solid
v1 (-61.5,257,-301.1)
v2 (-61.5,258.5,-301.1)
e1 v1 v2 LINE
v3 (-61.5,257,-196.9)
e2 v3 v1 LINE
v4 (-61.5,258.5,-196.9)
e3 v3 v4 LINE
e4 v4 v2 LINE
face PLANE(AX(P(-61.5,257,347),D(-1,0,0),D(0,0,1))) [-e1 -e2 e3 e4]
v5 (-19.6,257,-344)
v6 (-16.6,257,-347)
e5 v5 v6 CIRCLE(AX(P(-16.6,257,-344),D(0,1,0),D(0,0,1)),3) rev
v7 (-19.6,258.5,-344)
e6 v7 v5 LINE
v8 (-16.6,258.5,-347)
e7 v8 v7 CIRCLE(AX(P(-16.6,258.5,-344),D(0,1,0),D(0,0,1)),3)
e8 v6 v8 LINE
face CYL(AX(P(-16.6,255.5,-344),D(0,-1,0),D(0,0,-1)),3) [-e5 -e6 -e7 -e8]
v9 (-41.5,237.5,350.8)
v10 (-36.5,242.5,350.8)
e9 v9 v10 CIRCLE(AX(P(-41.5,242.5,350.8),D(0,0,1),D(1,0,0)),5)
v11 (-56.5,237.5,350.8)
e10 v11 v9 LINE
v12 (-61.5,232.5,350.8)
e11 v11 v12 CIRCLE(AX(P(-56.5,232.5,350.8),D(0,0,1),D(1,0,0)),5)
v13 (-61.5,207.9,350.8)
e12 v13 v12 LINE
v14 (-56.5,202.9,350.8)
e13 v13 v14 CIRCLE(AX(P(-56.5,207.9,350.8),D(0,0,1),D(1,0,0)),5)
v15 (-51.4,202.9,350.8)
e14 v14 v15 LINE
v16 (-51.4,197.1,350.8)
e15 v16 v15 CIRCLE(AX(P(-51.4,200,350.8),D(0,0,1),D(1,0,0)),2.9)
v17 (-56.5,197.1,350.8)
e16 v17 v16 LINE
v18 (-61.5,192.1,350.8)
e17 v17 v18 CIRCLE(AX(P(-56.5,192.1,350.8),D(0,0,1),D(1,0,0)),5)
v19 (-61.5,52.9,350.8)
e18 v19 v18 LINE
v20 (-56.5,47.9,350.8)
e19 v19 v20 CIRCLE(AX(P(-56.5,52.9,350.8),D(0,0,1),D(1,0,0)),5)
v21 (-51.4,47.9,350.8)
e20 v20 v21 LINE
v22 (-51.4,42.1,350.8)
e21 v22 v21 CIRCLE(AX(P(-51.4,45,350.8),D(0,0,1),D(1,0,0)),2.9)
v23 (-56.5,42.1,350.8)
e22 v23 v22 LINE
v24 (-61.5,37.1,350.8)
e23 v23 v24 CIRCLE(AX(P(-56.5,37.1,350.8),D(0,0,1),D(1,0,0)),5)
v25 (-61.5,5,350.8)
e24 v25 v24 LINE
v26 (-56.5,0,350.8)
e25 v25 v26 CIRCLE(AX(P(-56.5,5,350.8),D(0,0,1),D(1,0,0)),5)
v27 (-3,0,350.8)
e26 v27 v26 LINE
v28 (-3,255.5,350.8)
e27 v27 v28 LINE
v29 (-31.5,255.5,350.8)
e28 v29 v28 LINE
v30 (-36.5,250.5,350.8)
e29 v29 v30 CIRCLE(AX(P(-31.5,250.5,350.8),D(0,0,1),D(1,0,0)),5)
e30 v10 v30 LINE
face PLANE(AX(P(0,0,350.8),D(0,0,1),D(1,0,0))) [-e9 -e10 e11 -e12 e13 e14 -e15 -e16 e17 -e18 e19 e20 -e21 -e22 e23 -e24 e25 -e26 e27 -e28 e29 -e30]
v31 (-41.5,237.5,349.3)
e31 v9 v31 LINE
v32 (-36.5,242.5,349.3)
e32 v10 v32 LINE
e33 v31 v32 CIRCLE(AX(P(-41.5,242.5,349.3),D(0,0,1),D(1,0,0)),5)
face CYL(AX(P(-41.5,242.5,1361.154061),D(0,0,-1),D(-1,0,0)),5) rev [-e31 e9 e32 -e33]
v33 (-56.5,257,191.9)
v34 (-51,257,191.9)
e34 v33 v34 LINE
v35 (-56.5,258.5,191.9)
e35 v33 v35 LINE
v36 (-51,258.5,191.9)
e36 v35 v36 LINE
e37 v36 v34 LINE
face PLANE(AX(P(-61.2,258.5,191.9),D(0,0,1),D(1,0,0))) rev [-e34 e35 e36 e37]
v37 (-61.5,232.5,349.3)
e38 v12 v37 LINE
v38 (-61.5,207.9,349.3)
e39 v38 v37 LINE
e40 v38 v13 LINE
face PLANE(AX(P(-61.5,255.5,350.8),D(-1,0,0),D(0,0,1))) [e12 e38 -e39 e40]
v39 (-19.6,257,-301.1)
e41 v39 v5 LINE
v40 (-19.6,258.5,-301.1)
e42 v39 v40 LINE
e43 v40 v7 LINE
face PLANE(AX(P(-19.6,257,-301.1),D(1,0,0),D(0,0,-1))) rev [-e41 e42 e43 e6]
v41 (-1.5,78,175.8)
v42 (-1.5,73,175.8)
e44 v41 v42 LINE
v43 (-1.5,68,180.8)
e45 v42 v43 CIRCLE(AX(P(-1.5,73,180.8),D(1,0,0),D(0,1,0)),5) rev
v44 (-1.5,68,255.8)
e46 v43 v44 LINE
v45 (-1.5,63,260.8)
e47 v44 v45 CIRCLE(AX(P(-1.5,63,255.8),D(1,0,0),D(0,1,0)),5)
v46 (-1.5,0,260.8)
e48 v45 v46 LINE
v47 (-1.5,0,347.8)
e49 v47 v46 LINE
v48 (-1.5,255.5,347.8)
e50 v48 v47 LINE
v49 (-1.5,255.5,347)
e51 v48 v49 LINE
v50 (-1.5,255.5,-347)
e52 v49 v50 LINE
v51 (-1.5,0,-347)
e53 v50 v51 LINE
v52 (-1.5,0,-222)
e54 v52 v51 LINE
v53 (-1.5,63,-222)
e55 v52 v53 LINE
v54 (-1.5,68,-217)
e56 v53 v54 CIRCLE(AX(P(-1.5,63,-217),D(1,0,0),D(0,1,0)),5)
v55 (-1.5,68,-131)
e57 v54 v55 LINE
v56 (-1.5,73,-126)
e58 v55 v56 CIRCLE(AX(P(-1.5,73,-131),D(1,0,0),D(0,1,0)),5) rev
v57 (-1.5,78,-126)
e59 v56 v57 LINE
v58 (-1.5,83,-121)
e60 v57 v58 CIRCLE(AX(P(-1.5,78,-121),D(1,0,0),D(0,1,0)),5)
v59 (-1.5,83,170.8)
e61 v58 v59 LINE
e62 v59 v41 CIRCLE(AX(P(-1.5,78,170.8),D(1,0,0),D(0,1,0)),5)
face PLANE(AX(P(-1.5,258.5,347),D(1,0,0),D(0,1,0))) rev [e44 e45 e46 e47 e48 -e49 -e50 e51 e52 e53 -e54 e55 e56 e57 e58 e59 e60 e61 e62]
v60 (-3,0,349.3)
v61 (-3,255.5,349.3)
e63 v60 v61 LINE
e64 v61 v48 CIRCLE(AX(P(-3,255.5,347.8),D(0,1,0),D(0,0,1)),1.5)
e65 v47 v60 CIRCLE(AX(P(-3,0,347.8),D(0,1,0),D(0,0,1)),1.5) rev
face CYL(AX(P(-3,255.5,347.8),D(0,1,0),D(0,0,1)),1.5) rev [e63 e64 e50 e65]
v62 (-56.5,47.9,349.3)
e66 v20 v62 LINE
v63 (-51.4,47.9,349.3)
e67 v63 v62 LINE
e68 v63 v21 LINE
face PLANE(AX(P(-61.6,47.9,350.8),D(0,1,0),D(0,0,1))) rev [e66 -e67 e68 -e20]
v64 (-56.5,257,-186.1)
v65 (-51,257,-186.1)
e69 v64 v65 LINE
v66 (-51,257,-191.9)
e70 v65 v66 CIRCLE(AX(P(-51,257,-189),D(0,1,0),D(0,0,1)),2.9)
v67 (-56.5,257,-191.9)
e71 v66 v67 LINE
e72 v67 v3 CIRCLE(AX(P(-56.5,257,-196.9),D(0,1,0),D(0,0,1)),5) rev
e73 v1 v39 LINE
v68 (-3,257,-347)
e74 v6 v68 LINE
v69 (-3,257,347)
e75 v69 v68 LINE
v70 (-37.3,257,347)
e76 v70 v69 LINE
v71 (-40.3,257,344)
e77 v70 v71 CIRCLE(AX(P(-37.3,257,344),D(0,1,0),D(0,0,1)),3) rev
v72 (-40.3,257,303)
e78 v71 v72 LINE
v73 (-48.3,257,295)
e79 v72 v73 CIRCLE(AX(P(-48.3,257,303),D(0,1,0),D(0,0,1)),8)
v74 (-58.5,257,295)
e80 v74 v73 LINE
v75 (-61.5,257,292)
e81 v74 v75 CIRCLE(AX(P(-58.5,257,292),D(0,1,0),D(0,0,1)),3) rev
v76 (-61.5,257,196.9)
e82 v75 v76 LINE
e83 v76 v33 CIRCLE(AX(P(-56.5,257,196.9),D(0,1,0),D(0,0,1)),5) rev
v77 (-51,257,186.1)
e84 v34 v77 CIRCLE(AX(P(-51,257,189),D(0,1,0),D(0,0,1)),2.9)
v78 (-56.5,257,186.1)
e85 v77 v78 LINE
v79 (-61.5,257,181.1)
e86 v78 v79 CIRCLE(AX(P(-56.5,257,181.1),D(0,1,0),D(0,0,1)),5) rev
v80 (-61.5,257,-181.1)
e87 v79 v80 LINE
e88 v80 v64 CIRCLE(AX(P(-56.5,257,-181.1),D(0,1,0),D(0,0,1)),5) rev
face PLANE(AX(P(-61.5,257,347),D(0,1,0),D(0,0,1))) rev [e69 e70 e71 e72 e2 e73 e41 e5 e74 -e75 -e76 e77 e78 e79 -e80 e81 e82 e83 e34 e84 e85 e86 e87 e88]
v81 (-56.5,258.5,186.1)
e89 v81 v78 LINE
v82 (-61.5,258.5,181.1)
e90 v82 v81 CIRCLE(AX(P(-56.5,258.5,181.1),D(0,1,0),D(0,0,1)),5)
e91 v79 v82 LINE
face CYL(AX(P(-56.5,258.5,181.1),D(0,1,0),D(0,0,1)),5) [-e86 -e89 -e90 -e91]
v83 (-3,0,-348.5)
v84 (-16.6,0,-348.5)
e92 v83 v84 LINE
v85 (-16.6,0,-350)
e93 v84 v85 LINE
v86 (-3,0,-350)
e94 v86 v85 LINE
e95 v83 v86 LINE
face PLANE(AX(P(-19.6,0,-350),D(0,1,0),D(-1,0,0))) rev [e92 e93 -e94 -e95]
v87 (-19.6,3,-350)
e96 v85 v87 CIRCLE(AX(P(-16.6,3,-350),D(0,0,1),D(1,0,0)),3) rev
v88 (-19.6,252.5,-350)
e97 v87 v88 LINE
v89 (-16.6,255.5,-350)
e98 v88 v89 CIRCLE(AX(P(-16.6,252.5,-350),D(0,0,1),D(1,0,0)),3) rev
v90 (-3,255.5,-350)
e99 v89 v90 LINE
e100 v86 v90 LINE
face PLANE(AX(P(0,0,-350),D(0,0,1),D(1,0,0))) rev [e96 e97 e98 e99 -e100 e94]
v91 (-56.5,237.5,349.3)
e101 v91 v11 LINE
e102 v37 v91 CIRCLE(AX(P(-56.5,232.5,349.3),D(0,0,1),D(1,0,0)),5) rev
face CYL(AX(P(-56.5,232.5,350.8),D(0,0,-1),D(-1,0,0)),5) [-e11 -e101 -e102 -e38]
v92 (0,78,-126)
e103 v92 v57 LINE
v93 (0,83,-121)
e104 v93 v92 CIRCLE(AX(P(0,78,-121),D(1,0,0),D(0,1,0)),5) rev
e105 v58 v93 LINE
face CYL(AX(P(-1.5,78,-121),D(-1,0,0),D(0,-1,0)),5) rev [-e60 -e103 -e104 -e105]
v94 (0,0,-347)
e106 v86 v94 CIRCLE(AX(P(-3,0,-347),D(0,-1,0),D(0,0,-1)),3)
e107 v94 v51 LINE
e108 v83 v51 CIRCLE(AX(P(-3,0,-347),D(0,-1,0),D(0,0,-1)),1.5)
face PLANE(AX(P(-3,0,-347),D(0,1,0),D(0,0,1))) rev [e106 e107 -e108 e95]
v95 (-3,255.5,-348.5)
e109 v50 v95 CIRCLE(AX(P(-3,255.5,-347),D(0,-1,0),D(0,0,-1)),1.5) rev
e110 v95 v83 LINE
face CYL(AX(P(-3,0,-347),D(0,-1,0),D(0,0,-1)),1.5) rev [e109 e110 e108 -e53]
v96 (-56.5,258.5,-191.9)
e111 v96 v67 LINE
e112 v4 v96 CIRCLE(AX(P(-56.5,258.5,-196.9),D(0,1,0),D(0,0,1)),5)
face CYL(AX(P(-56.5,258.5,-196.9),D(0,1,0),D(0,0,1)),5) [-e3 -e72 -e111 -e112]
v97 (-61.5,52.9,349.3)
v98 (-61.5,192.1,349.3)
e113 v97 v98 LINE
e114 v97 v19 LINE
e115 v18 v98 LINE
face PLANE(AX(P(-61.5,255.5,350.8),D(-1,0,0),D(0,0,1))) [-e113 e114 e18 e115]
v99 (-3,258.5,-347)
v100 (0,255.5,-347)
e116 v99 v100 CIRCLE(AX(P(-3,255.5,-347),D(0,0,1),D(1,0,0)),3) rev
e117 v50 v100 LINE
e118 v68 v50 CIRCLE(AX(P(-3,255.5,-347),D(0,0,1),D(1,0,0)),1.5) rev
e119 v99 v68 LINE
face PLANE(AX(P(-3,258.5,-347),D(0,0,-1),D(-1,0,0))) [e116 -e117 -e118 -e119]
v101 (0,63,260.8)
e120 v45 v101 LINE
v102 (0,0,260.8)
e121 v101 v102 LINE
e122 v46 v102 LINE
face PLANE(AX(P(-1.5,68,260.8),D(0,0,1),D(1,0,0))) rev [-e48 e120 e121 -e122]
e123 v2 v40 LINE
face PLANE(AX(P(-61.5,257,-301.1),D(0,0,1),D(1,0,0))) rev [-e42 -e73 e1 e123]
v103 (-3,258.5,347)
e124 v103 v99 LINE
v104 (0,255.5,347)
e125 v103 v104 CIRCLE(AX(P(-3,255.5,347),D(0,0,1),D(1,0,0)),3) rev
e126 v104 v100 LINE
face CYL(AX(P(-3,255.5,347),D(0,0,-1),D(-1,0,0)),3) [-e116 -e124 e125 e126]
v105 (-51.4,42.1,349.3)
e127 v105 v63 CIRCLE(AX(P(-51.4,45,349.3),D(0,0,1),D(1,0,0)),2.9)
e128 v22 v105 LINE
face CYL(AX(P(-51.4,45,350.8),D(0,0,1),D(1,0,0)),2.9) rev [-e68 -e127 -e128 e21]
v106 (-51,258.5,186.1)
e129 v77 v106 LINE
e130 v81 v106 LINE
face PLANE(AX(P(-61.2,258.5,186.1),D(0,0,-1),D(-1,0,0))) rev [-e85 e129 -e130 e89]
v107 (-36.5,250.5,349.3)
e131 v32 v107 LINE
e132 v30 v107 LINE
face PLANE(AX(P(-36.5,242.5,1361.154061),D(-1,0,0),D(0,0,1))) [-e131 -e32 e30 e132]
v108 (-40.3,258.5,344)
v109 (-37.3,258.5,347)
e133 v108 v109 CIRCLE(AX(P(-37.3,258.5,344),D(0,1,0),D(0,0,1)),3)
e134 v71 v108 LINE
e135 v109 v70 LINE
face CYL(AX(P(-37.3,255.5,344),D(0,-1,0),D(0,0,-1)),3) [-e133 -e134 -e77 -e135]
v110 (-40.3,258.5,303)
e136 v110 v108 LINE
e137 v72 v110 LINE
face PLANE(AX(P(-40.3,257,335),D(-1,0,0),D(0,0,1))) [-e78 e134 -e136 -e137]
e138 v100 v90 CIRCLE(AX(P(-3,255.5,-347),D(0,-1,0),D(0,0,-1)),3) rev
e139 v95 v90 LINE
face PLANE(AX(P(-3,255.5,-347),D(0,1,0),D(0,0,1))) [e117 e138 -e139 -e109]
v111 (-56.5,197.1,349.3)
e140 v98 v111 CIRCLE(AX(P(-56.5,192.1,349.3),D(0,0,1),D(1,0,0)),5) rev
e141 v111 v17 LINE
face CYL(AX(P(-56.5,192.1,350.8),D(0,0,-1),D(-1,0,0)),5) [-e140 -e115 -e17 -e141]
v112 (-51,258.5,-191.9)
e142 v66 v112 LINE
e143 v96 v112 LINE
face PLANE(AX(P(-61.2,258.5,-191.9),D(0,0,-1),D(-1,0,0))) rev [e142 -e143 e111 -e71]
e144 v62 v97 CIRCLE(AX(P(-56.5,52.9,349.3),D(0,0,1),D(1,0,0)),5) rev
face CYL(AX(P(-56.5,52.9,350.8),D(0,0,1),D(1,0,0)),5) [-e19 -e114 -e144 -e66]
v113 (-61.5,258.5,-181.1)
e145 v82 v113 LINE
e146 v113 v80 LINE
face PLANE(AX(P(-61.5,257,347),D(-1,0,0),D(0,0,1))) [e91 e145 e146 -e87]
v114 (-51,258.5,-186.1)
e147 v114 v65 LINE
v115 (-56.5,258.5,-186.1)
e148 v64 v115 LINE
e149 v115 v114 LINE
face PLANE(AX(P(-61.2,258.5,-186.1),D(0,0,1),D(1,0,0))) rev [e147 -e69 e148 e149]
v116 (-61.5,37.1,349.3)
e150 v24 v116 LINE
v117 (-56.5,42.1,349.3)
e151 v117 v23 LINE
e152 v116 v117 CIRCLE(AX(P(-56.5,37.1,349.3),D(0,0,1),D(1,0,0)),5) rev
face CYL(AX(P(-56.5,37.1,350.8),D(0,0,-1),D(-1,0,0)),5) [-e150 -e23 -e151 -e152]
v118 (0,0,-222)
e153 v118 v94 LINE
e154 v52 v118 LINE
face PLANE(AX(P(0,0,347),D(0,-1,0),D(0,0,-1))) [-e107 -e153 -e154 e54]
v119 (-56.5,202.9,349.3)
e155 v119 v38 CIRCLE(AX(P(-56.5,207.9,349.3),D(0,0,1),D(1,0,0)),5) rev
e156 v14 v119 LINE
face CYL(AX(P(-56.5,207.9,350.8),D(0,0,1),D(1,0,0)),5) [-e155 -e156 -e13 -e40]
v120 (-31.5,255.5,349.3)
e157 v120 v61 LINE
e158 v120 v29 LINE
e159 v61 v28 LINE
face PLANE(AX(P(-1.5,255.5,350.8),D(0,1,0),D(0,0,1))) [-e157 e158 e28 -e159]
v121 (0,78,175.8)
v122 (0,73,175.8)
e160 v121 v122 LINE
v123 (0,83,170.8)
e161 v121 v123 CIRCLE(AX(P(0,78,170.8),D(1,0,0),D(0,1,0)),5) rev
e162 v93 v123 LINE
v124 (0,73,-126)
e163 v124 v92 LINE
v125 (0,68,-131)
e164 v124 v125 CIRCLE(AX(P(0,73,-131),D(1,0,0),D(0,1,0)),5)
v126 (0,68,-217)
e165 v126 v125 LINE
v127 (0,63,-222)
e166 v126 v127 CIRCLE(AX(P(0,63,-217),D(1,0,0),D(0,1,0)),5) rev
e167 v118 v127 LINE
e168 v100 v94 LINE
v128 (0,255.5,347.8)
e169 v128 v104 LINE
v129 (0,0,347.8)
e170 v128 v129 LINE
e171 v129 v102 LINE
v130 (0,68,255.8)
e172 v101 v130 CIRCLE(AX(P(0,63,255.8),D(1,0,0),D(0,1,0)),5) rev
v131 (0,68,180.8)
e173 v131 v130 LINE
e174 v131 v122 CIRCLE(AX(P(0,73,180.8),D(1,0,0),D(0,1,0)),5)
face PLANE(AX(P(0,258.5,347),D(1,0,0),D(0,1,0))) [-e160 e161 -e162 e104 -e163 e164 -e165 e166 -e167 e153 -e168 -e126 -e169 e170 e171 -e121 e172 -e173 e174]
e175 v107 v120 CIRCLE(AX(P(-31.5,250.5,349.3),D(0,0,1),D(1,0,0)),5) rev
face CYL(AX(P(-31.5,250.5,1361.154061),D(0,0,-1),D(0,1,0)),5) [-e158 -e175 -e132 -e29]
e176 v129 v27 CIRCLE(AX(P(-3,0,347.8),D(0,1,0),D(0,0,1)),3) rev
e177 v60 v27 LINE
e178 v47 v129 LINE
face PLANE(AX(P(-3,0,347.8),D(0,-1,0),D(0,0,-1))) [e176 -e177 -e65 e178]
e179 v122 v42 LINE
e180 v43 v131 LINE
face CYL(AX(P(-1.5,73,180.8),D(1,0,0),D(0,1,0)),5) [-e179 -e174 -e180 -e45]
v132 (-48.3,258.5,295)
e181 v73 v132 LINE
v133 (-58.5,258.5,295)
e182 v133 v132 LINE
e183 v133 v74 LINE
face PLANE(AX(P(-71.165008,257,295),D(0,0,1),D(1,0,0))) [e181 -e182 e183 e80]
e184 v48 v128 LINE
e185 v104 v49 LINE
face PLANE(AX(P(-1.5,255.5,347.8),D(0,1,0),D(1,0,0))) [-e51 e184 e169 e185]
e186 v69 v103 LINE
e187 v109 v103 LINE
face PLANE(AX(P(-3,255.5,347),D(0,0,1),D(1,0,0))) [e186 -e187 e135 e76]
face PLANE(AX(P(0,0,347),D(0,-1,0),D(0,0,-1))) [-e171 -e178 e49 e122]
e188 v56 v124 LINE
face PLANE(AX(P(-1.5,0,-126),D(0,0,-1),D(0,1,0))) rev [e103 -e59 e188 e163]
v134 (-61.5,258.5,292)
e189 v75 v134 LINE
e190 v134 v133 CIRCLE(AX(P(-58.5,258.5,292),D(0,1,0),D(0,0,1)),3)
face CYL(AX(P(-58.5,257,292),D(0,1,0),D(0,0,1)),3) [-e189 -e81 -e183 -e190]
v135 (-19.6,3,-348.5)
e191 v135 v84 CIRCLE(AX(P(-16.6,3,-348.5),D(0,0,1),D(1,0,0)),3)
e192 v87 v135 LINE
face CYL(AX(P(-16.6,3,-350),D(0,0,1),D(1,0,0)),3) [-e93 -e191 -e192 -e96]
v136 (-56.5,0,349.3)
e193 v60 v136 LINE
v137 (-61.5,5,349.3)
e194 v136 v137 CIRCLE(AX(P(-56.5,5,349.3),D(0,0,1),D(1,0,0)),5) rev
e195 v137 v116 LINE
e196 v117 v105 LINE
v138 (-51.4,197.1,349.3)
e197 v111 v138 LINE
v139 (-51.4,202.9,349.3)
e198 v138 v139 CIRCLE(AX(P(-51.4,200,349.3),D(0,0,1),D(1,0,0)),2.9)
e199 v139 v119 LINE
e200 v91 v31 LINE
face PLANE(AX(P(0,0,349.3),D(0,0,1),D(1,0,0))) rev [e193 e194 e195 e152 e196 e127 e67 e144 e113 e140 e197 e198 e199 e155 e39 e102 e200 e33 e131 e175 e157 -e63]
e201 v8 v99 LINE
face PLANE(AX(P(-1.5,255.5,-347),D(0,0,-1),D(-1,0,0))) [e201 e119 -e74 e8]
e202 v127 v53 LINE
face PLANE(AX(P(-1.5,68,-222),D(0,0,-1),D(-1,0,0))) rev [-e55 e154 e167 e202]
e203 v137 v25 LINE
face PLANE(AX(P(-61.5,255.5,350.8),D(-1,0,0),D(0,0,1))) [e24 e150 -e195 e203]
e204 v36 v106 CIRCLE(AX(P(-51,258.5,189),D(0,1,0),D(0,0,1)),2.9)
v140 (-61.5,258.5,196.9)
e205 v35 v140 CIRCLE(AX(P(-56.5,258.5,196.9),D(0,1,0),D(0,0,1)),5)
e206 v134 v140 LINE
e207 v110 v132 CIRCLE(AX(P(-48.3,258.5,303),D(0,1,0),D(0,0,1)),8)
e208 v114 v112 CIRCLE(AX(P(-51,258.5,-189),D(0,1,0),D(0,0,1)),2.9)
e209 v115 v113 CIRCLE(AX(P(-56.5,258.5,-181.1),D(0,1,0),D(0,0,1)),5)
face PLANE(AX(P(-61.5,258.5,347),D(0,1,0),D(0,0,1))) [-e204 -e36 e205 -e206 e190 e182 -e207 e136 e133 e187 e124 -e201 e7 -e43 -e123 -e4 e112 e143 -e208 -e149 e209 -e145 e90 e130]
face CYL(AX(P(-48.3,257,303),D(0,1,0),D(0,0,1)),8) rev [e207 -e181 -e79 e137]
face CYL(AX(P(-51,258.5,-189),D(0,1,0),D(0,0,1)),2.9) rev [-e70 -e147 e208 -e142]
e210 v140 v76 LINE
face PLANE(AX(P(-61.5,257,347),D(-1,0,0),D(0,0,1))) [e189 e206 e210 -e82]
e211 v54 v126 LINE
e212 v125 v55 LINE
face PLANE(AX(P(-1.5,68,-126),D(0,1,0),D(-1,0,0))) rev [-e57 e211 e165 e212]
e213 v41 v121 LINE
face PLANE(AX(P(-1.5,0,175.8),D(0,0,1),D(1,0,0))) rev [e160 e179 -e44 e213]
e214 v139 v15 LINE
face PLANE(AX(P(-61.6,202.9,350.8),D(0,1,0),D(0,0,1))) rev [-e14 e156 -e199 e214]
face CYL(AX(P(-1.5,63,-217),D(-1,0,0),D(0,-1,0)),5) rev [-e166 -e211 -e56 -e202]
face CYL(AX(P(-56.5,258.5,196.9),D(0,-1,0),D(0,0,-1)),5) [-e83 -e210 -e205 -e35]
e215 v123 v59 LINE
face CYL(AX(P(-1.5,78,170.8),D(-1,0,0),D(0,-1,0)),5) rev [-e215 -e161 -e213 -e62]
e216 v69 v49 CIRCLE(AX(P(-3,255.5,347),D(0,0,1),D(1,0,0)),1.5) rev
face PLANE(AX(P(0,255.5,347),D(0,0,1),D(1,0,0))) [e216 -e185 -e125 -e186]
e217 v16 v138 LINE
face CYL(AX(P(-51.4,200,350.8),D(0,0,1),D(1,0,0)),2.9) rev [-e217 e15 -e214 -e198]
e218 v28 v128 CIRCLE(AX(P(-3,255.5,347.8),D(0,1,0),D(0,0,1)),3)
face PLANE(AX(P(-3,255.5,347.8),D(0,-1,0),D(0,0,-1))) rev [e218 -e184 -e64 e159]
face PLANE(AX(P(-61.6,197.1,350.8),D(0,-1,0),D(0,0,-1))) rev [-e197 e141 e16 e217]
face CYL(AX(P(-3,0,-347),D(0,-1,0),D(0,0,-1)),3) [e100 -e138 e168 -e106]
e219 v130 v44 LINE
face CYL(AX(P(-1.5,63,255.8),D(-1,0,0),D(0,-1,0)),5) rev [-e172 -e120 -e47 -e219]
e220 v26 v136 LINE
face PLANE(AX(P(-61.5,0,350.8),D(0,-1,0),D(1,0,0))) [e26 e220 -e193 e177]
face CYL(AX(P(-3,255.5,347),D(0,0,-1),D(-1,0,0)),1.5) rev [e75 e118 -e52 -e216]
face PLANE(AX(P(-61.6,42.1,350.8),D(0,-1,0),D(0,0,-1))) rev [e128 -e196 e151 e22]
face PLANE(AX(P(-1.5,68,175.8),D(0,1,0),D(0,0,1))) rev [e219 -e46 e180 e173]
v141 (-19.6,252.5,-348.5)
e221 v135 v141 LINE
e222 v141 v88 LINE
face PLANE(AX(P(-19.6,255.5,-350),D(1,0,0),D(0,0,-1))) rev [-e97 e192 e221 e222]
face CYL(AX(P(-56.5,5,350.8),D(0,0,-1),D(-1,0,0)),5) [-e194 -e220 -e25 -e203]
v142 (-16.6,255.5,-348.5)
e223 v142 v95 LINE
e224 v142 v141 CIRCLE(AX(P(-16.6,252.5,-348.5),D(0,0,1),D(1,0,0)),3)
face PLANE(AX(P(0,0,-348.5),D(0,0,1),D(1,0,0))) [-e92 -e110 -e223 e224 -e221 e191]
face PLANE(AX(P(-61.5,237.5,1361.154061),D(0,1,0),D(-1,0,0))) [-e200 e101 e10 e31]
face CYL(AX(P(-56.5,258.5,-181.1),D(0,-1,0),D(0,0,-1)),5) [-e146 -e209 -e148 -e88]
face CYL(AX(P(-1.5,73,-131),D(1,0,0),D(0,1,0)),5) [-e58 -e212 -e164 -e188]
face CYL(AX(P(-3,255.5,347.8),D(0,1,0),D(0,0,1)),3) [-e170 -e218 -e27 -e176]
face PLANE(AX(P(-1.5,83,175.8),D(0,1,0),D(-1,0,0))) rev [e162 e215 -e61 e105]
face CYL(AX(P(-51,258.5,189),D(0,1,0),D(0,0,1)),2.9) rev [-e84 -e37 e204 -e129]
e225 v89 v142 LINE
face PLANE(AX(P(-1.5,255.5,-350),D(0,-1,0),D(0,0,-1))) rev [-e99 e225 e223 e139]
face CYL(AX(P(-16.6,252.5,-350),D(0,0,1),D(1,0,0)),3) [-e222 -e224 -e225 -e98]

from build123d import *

# Parameters (mm, degrees)
BASE_FLANGE1_DEPTH       = 347
EDGE_FLANGE1_DEPTH       = 255.5
SKETCH5_W                = 301.8
SKETCH5_H                = 83
CUT_EXTRUDE1_DEPTH       = 10
SKETCH6_W                = 41.9
SKETCH6_H                = 45.9
CUT_EXTRUDE2_DEPTH       = 1.5
CUT_EXTRUDE3_DEPTH       = 1.5
EDGE_FLANGE2_DEPTH       = 255.5
M5_START                 = 349.3
M5_CLEARANCE_SLOT1_DEPTH = 1.5
FILLET1_R                = 5
M5_START_2               = 257
M5_CLEARANCE_SLOT2_DEPTH = 1.5
FILLET2_R                = 5
FILLET3_R                = 3
SKETCH15_W               = 96
SKETCH15_H               = 68
CUT_EXTRUDE4_DEPTH       = 10
SKETCH16_W               = 85
SKETCH16_H               = 68
CUT_EXTRUDE5_DEPTH       = 1.5
FILLET4_R                = 5
FILLET5_R                = 3
CUT_EXTRUDE6_DEPTH       = 750.483248688
CUT_EXTRUDE6_DEPTH_BACK  = 4
FILLET6_R                = 5


# Read off the part's stored shape, not the designer's step: M5 Clearance Slot1, M5 Clearance Slot2
# Sheet-metal steps are written as plain solids
with BuildPart() as part:
    # Sketch1 → Base-Flange1 (new, symmetric)
    with BuildSketch(Plane.XY):
        with BuildLine():
            Line((-61.5, 258.5), (-3, 258.5))
            ThreePointArc((-3, 258.5), (-0.878679656, 257.621320344), (0, 255.5))
            Line((0, 255.5), (0, 0))
            Line((0, 0), (-1.5, 0))
            Line((-1.5, 0), (-1.5, 255.5))
            ThreePointArc((-1.5, 255.5), (-1.939339828, 256.560660172), (-3, 257))
            Line((-3, 257), (-61.5, 257))
            Line((-61.5, 257), (-61.5, 258.5))
        make_face()
    extrude(amount=BASE_FLANGE1_DEPTH, both=True)

    # Edge-Flange1 section (across the edge) → Edge-Flange1 (add)
    with BuildSketch(Plane(origin=(-1.5, 0, 349.3), x_dir=(0, 0, -1), z_dir=(0, 1, 0))):
        with BuildLine():
            Line((-1.5, 1.5), (-1.5, 60))
            Line((-1.5, 60), (0, 60))
            Line((0, 60), (0, 1.5))
            ThreePointArc((0, 1.5), (0.439339828, 0.439339828), (1.5, 0))
            Line((1.5, 0), (2.3, 0))
            Line((2.3, 0), (2.3, -1.5))
            Line((2.3, -1.5), (1.5, -1.5))
            ThreePointArc((1.5, -1.5), (-0.621320344, -0.621320344), (-1.5, 1.5))
        make_face()
    extrude(amount=EDGE_FLANGE1_DEPTH)

    # Sketch5 → Cut-Extrude1 (cut)
    with BuildSketch(Plane(origin=(0, 0, 0), x_dir=(0, 0, -1), z_dir=(1, 0, 0))):
        with Locations((-24.9, 41.5)):
            Rectangle(SKETCH5_W, SKETCH5_H)
    extrude(amount=-CUT_EXTRUDE1_DEPTH, mode=Mode.SUBTRACT)

    # Sketch6 → Cut-Extrude2 (cut)
    with BuildSketch(Plane(origin=(0, 258.5, 0), x_dir=(1, 0, 0), z_dir=(0, 1, 0))):
        with Locations((-40.55, 324.05)):
            Rectangle(SKETCH6_W, SKETCH6_H)
    extrude(amount=-CUT_EXTRUDE2_DEPTH, mode=Mode.SUBTRACT)

    # Sketch7 → Cut-Extrude3 (cut)
    with BuildSketch(Plane(origin=(0, 258.5, 0), x_dir=(1, 0, 0), z_dir=(0, 1, 0))):
        with BuildLine():
            Line((-40.3, -335), (-40.3, -303))
            ThreePointArc((-40.3, -303), (-42.643145751, -297.343145751), (-48.3, -295))
            Line((-48.3, -295), (-71.165008453, -295))
            Line((-71.165008453, -295), (-71.165008453, -343))
            Line((-71.165008453, -343), (-71.165008453, -364.064767585))
            Line((-71.165008453, -364.064767585), (-40.3, -364.064767585))
            Line((-40.3, -364.064767585), (-40.3, -335))
        make_face()
    extrude(amount=-CUT_EXTRUDE3_DEPTH, mode=Mode.SUBTRACT)

    # Edge-Flange2 section (across the edge) → Edge-Flange2 (add)
    with BuildSketch(Plane(origin=(-1.5, 255.5, -348.5), x_dir=(0, 0, 1), z_dir=(0, -1, 0))):
        with BuildLine():
            Line((-1.5, 1.5), (-1.5, 18.1))
            Line((-1.5, 18.1), (0, 18.1))
            Line((0, 18.1), (0, 1.5))
            ThreePointArc((0, 1.5), (0.439339828, 0.439339828), (1.5, 0))
            Line((1.5, 0), (1.5, -1.5))
            ThreePointArc((1.5, -1.5), (-0.621320344, -0.621320344), (-1.5, 1.5))
        make_face()
    extrude(amount=EDGE_FLANGE2_DEPTH)

    # M5 Clearance Slot1 outline → M5 Clearance Slot1 (cut)
    with BuildSketch(Plane.XY.offset(M5_START)):
        with BuildLine():
            Line((-61.5, 42.1), (-51.4, 42.1))
            ThreePointArc((-51.4, 42.1), (-48.5, 45), (-51.4, 47.9))
            Line((-51.4, 47.9), (-61.5, 47.9))
            Line((-61.5, 47.9), (-61.5, 42.1))
        make_face()
        with BuildLine():
            Line((-61.5, 202.9), (-61.5, 197.1))
            Line((-61.5, 197.1), (-51.4, 197.1))
            ThreePointArc((-51.4, 197.1), (-48.5, 200), (-51.4, 202.9))
            Line((-51.4, 202.9), (-61.5, 202.9))
        make_face()
    extrude(amount=M5_CLEARANCE_SLOT1_DEPTH, mode=Mode.SUBTRACT)

    # Fillet1
    fillet1_edges = [part.edges().sort_by_distance(p)[0] for p in [
        (-61.5, 42.1, 350.05),
        (-61.5, 47.9, 350.05),
        (-61.5, 197.1, 350.05),
        (-61.5, 202.9, 350.05),
        (-61.5, 0, 350.05),
        (-61.5, 255.5, 350.05),
    ]]
    fillet(fillet1_edges, radius=FILLET1_R)

    # M5 Clearance Slot2 outline → M5 Clearance Slot2 (cut)
    with BuildSketch(Plane(origin=(0, 0, 0), x_dir=(1, 0, 0), z_dir=(0, 1, 0)).offset(M5_START_2)):
        with BuildLine():
            Line((-51, 191.9), (-61.2, 191.9))
            ThreePointArc((-61.2, 191.9), (-61.350201599, 191.896107643), (-61.5, 191.88444102))
            Line((-61.5, 191.88444102), (-61.5, 186.11555898))
            ThreePointArc((-61.5, 186.11555898), (-61.350201599, 186.103892357), (-61.2, 186.1))
            Line((-61.2, 186.1), (-51, 186.1))
            ThreePointArc((-51, 186.1), (-48.1, 189), (-51, 191.9))
        make_face()
        with BuildLine():
            ThreePointArc((-61.2, -186.1), (-61.350201599, -186.103892357), (-61.5, -186.11555898))
            Line((-61.5, -186.11555898), (-61.5, -191.88444102))
            ThreePointArc((-61.5, -191.88444102), (-61.350201599, -191.896107643), (-61.2, -191.9))
            Line((-61.2, -191.9), (-51, -191.9))
            ThreePointArc((-51, -191.9), (-48.1, -189), (-51, -186.1))
            Line((-51, -186.1), (-61.2, -186.1))
        make_face()
    extrude(amount=M5_CLEARANCE_SLOT2_DEPTH, mode=Mode.SUBTRACT)

    # Fillet2
    fillet2_edges = [part.edges().sort_by_distance(p)[0] for p in [
        (-61.5, 257.75, 186.11555898),
        (-61.5, 257.75, 191.88444102),
        (-61.5, 257.75, -191.88444102),
        (-61.5, 257.75, -186.11555898),
    ]]
    fillet(fillet2_edges, radius=FILLET2_R)

    # Fillet3
    fillet3_edges = [part.edges().sort_by_distance(p)[0] for p in [
        (-19.6, 255.5, -349.25),
        (-19.6, 0, -349.25),
        (-19.6, 257.75, -347),
    ]]
    fillet(fillet3_edges, radius=FILLET3_R)

    # Sketch15 → Cut-Extrude4 (cut)
    with BuildSketch(Plane(origin=(0, 0, 0), x_dir=(0, 0, -1), z_dir=(1, 0, 0))):
        with Locations((174, 34)):
            Rectangle(SKETCH15_W, SKETCH15_H)
    extrude(amount=-CUT_EXTRUDE4_DEPTH, mode=Mode.SUBTRACT)

    # Sketch16 → Cut-Extrude5 (cut)
    with BuildSketch(Plane(origin=(0, 0, 0), x_dir=(0, 0, -1), z_dir=(1, 0, 0))):
        with Locations((-218.3, 34)):
            Rectangle(SKETCH16_W, SKETCH16_H)
    extrude(amount=-CUT_EXTRUDE5_DEPTH, mode=Mode.SUBTRACT)

    # Fillet4
    fillet4_edges = [part.edges().sort_by_distance(p)[0] for p in [
        (-0.75, 68, -126),
        (-0.75, 68, -222),
        (-0.75, 68, 175.8),
        (-0.75, 68, 260.8),
        (-0.75, 83, 175.8),
        (-0.75, 83, -126),
    ]]
    fillet(fillet4_edges, radius=FILLET4_R)

    # Fillet5
    fillet5_edges = [part.edges().sort_by_distance(p)[0] for p in [
        (-40.3, 257.75, 347),
        (-61.5, 257.75, 295),
    ]]
    fillet(fillet5_edges, radius=FILLET5_R)

    # Sketch17 → Cut-Extrude6 (cut, two sides: drawn at the far end of the back side and taken through both)
    with BuildSketch(Plane.XY.offset(350.8).offset(-CUT_EXTRUDE6_DEPTH_BACK)):
        with BuildLine():
            Line((-61.5, 250.5), (-61.5, 237.5))
            Line((-61.5, 237.5), (-41.5, 237.5))
            ThreePointArc((-41.5, 237.5), (-37.964466094, 238.964466094), (-36.5, 242.5))
            Line((-36.5, 242.5), (-36.5, 255.5))
            Line((-36.5, 255.5), (-56.5, 255.5))
            ThreePointArc((-56.5, 255.5), (-60.035533906, 254.035533906), (-61.5, 250.5))
        make_face()
    extrude(amount=CUT_EXTRUDE6_DEPTH + CUT_EXTRUDE6_DEPTH_BACK, mode=Mode.SUBTRACT)

    # Fillet6
    fillet6_edges = [part.edges().sort_by_distance(p)[0] for p in [
        (-61.5, 237.5, 350.05),
        (-36.5, 255.5, 350.05),
    ]]
    fillet(fillet6_edges, radius=FILLET6_R)


solid = part.part
